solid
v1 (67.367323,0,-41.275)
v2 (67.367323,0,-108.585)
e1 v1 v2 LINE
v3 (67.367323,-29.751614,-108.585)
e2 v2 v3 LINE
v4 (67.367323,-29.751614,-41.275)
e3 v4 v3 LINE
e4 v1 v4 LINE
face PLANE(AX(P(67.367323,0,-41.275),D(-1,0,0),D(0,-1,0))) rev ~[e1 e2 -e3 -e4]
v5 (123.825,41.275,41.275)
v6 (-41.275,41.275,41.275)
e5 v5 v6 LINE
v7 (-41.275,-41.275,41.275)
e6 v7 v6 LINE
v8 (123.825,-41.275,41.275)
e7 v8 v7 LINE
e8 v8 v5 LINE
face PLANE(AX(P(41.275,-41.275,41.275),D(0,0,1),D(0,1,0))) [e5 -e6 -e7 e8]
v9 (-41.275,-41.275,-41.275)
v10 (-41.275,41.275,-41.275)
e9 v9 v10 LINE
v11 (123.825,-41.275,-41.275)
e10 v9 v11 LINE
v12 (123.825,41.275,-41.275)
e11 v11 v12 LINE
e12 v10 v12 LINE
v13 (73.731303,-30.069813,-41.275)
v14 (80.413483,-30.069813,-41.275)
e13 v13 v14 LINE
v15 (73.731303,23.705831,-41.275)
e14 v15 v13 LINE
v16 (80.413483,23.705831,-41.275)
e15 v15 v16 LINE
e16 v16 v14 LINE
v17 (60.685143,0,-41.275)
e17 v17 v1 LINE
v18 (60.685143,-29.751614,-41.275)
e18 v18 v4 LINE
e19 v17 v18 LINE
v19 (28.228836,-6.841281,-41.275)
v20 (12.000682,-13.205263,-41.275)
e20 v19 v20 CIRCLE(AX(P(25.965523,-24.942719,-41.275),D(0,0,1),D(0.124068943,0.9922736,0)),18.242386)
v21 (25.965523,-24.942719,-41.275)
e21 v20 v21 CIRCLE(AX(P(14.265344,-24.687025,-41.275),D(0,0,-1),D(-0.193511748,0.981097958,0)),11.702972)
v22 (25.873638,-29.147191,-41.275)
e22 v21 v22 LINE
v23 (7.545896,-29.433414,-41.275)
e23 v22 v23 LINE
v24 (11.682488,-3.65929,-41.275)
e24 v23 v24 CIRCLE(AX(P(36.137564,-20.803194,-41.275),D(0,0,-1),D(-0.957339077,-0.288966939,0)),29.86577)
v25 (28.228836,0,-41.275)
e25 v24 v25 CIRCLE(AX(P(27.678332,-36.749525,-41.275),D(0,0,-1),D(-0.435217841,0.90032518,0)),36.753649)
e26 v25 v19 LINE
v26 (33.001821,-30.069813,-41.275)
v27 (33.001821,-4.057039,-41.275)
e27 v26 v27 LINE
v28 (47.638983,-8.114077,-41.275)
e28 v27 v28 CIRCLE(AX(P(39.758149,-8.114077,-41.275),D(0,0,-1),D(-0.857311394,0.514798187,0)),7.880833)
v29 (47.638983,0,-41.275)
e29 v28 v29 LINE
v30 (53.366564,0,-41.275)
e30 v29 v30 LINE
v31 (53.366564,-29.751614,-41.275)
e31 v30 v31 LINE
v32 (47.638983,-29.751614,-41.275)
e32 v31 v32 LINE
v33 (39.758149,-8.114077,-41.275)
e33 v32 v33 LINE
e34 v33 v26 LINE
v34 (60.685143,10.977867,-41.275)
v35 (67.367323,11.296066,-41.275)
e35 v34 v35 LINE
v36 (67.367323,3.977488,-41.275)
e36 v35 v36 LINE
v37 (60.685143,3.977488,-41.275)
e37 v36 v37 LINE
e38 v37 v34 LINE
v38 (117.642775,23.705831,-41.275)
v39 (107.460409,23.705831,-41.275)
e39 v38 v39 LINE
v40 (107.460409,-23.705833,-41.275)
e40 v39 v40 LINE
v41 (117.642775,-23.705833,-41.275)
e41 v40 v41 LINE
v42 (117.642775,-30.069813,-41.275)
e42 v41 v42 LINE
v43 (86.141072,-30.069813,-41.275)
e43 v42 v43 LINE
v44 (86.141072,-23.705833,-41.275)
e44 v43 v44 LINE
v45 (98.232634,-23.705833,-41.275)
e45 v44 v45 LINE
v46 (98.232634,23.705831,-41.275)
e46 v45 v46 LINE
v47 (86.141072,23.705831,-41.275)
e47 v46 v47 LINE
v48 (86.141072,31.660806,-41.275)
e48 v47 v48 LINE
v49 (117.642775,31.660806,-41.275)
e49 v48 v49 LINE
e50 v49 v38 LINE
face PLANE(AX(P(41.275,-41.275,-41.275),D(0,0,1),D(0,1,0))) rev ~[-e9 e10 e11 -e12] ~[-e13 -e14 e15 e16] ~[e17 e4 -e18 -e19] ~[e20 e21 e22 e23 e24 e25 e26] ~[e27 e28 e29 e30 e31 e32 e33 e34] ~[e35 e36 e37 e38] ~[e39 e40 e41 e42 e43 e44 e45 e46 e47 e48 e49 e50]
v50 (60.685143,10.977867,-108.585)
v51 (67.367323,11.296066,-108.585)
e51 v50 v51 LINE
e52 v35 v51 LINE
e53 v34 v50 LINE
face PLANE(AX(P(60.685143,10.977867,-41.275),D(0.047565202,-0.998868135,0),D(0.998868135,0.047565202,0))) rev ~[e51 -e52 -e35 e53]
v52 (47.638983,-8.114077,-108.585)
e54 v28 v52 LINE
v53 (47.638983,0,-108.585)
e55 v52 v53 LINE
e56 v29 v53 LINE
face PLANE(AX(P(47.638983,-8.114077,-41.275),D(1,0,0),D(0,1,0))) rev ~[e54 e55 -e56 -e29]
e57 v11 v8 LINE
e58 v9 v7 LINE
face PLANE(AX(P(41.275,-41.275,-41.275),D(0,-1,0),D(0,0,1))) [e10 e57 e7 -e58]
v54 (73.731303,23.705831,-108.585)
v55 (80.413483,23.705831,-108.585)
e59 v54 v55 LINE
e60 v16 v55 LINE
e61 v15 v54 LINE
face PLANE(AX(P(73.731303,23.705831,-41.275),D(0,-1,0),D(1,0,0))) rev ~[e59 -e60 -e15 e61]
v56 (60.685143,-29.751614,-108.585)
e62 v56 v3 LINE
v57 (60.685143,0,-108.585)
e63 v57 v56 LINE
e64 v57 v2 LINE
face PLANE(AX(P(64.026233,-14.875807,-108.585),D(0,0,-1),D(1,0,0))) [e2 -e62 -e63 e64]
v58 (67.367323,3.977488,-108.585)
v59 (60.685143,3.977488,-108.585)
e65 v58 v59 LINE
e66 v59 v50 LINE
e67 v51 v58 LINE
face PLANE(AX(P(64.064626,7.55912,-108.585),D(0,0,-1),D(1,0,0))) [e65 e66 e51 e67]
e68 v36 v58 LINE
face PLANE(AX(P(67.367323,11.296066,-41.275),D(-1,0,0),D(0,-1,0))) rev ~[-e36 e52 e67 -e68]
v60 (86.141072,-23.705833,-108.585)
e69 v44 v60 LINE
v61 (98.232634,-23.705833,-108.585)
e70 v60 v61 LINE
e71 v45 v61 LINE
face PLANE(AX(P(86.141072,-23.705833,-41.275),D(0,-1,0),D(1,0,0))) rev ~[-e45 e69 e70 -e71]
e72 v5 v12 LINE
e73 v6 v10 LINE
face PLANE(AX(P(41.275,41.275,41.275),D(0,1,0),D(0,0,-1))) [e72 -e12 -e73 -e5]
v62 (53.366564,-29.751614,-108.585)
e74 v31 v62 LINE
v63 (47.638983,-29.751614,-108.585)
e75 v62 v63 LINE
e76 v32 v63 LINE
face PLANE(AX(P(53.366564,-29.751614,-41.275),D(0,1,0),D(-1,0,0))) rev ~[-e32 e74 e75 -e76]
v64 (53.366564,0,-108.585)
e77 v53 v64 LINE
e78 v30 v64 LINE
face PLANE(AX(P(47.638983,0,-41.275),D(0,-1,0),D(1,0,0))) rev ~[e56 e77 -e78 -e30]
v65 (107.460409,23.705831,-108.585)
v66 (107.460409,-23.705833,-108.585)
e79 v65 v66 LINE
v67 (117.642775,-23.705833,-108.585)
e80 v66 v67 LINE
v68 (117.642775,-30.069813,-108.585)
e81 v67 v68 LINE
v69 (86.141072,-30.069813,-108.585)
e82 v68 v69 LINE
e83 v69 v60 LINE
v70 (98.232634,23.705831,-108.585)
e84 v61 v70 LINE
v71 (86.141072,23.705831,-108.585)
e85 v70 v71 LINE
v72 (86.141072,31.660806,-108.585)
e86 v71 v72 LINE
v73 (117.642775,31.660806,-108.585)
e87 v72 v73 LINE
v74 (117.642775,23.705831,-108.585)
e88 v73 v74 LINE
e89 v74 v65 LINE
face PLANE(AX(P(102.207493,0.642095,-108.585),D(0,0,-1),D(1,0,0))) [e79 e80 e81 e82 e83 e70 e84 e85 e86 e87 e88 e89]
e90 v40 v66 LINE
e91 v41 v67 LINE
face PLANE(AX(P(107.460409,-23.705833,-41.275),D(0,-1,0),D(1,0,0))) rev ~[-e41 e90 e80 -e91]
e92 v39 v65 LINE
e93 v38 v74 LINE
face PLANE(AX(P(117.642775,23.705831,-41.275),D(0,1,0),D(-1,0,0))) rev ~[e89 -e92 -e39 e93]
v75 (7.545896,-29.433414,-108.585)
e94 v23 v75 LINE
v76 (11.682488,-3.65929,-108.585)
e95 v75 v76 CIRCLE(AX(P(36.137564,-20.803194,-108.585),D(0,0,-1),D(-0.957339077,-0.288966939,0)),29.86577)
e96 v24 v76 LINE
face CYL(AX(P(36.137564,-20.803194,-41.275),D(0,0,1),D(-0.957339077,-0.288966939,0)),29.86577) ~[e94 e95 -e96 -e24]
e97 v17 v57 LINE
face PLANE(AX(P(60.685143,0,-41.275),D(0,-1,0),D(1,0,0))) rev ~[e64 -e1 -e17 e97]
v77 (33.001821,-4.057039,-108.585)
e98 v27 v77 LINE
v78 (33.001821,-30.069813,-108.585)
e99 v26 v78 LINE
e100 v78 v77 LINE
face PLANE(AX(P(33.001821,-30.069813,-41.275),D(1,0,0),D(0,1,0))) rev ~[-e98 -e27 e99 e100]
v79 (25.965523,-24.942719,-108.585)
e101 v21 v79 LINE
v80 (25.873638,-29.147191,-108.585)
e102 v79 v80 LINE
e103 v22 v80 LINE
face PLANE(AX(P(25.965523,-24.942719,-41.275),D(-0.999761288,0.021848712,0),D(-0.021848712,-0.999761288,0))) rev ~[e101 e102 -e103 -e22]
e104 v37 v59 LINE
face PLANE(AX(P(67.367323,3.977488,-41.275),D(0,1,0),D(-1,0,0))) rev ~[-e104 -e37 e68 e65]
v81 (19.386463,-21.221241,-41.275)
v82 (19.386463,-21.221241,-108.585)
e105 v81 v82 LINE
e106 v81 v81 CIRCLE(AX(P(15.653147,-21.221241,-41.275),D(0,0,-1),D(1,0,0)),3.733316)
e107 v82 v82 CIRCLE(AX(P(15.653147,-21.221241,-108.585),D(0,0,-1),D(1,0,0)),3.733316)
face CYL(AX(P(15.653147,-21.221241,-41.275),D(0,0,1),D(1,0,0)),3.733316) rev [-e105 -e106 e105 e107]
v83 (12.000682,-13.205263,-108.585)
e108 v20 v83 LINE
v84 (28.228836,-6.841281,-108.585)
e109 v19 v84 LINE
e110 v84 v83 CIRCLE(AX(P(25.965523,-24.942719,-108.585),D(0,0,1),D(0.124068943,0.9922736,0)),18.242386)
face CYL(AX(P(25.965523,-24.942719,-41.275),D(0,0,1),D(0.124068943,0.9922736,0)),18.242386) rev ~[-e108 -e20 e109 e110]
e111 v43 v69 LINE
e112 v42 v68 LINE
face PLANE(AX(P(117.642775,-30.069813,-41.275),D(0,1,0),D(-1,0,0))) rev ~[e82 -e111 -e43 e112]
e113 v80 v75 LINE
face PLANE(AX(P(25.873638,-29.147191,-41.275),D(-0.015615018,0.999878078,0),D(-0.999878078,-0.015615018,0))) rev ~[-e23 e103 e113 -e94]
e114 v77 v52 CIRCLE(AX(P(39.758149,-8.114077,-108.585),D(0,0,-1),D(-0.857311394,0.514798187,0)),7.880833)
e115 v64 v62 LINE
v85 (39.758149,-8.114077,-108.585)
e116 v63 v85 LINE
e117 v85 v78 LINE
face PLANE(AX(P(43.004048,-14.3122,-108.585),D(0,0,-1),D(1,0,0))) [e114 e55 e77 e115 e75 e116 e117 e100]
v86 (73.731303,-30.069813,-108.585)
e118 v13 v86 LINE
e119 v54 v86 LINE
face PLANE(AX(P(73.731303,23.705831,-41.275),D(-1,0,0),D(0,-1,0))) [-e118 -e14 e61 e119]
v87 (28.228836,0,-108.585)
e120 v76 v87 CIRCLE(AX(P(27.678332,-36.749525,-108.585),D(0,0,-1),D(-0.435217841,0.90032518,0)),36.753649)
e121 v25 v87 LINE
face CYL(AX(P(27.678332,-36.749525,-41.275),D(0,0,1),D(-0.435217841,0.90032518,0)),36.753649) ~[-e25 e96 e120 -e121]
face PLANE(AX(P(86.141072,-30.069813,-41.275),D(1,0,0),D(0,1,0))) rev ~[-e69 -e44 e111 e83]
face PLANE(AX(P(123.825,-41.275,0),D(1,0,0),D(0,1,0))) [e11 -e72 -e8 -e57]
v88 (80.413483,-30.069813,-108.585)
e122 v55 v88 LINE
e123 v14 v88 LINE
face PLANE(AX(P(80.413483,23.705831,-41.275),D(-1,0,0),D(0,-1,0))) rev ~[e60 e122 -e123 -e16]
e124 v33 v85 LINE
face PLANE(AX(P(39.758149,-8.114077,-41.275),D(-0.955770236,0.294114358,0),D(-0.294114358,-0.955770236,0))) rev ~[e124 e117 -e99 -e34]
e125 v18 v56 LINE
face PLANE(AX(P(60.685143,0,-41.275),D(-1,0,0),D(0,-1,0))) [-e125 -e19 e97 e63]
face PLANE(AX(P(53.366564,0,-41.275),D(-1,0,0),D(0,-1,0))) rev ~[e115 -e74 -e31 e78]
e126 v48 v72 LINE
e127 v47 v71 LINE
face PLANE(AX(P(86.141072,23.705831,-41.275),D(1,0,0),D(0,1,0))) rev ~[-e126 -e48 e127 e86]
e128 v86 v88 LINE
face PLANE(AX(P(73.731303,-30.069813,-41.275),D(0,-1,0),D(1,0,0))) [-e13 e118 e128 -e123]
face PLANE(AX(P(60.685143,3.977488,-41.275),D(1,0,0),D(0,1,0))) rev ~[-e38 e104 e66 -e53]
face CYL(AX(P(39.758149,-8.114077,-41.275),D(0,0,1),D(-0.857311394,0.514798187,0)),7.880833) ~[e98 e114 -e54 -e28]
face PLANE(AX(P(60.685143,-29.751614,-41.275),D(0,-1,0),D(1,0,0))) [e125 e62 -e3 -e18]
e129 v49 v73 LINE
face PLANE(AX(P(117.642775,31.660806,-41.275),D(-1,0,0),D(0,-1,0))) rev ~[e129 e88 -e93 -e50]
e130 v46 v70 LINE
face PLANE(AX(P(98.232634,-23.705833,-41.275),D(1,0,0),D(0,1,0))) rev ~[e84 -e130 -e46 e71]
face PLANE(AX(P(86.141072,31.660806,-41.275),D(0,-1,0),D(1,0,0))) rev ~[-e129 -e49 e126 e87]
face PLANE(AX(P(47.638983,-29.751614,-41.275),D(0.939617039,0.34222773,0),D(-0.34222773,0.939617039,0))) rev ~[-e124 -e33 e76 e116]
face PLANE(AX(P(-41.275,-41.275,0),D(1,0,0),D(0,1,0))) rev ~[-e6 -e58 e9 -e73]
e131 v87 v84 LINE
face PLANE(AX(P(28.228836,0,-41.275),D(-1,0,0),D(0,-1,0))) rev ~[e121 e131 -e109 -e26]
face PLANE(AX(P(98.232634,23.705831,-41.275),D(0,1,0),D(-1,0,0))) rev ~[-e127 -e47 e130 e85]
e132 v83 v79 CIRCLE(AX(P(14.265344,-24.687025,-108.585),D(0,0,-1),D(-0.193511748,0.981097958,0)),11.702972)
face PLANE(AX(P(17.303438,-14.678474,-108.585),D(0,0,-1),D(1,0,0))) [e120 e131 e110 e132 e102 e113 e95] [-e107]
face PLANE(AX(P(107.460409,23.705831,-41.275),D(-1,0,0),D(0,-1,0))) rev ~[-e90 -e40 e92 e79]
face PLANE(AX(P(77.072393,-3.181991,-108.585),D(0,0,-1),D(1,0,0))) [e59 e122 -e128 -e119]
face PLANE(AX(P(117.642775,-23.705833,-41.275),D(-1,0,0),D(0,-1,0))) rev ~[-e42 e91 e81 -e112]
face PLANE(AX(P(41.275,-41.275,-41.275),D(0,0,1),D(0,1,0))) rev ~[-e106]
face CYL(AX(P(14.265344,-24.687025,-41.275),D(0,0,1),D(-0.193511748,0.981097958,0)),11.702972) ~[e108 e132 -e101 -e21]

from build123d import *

# Parameters (mm, degrees)
F1_W     = 82.55
F1_H     = 82.55
F2_DEPTH = 41.275
F3_DEPTH = 82.55
F4_W     = 6.6821798682
F4_H     = 53.7756439298
F4_H_2   = 29.7516137362
F4_R     = 3.7333162537
F5_DEPTH = 67.31


# Not quite as in the source:
# - a variable given as a bare number and used for a length is read in inches; the dataset says mm whatever the document's units were


with BuildPart() as f2:
    # F1 (on Top) → F2 (new body, symmetric)
    with BuildSketch(Plane.XY):
        Rectangle(F1_W, F1_H)
    extrude(amount=F2_DEPTH, both=True)

    # F3 (add): a face of the model
    f3_faces = [f2.faces().sort_by_distance(p)[0] for p in [
        (41.275, 0, 0),
    ]]
    extrude(f3_faces, amount=F3_DEPTH)

    # F4 (on face) → F5 (join)
    with BuildSketch(Plane(origin=(0, 0, -41.275), x_dir=(1, 0, 0), z_dir=(0, 0, -1))):
        Polygon((117.642775178, -23.7058307976), (107.4604094028, -23.7058307976), (107.4604094028, 23.7058326602), (117.642775178, 23.7058326602), (117.642775178, 30.0698131323), (86.1410722136, 30.0698131323), (86.1410722136, 23.7058326602), (98.2326343656, 23.7058326602), (98.2326343656, -23.7058307976), (86.1410722136, -23.7058307976), (86.1410722136, -31.6608063877), (117.642775178, -31.6608063877), align=None)
        with Locations((77.0723931491, 3.1819911674)):
            Rectangle(F4_W, F4_H)
        with Locations((64.0262328088, 14.8758068681)):
            Rectangle(F4_W, F4_H_2)
        Polygon((60.6851428747, -10.9778670594), (67.3673227429, -11.2960664555), (67.3673227429, -3.9774877951), (60.6851428747, -3.9774877951), align=None)
        with BuildLine():
            Line((47.6389825344, 0), (53.3665642142, 0))
            Line((53.3665642142, 0), (53.3665642142, 29.7516137362))
            Line((53.3665642142, 29.7516137362), (47.6389825344, 29.7516137362))
            Line((47.6389825344, 29.7516137362), (39.7581494696, 8.1140771508))
            Line((39.7581494696, 8.1140771508), (33.0018214881, 30.0698131323))
            Line((33.0018214881, 30.0698131323), (33.0018214881, 4.0570385754))
            ThreePointArc((33.0018214881, 4.0570385754), (41.8631479069, 0.5195718098), (47.6389825344, 8.1140771508))
            Line((47.6389825344, 8.1140771508), (47.6389825344, 0))
        make_face()
        with BuildLine():
            ThreePointArc((7.5458958745, 29.43341434), (6.649165746, 16.0704833991), (11.6824880242, 3.6592902616))
            ThreePointArc((11.6824880242, 3.6592902616), (19.7418824044, 0.862989669), (28.2288361341, 0))
            Line((28.2288361341, 0), (28.2288361341, 6.8412809633))
            ThreePointArc((28.2288361341, 6.8412809633), (19.3054549337, 7.9595465035), (12.0006818324, 13.2052628323))
            ThreePointArc((12.0006818324, 13.2052628323), (21.7952321918, 15.7282111285), (25.9655225304, 24.9427194354))
            Line((25.9655225304, 24.9427194354), (25.8736382976, 29.1471914205))
            Line((25.8736382976, 29.1471914205), (7.5458958745, 29.43341434))
        make_face()
        with Locations((15.6531465528, 21.2212410615)):
            Circle(F4_R, mode=Mode.SUBTRACT)
    extrude(amount=F5_DEPTH)


solid = f2.part
